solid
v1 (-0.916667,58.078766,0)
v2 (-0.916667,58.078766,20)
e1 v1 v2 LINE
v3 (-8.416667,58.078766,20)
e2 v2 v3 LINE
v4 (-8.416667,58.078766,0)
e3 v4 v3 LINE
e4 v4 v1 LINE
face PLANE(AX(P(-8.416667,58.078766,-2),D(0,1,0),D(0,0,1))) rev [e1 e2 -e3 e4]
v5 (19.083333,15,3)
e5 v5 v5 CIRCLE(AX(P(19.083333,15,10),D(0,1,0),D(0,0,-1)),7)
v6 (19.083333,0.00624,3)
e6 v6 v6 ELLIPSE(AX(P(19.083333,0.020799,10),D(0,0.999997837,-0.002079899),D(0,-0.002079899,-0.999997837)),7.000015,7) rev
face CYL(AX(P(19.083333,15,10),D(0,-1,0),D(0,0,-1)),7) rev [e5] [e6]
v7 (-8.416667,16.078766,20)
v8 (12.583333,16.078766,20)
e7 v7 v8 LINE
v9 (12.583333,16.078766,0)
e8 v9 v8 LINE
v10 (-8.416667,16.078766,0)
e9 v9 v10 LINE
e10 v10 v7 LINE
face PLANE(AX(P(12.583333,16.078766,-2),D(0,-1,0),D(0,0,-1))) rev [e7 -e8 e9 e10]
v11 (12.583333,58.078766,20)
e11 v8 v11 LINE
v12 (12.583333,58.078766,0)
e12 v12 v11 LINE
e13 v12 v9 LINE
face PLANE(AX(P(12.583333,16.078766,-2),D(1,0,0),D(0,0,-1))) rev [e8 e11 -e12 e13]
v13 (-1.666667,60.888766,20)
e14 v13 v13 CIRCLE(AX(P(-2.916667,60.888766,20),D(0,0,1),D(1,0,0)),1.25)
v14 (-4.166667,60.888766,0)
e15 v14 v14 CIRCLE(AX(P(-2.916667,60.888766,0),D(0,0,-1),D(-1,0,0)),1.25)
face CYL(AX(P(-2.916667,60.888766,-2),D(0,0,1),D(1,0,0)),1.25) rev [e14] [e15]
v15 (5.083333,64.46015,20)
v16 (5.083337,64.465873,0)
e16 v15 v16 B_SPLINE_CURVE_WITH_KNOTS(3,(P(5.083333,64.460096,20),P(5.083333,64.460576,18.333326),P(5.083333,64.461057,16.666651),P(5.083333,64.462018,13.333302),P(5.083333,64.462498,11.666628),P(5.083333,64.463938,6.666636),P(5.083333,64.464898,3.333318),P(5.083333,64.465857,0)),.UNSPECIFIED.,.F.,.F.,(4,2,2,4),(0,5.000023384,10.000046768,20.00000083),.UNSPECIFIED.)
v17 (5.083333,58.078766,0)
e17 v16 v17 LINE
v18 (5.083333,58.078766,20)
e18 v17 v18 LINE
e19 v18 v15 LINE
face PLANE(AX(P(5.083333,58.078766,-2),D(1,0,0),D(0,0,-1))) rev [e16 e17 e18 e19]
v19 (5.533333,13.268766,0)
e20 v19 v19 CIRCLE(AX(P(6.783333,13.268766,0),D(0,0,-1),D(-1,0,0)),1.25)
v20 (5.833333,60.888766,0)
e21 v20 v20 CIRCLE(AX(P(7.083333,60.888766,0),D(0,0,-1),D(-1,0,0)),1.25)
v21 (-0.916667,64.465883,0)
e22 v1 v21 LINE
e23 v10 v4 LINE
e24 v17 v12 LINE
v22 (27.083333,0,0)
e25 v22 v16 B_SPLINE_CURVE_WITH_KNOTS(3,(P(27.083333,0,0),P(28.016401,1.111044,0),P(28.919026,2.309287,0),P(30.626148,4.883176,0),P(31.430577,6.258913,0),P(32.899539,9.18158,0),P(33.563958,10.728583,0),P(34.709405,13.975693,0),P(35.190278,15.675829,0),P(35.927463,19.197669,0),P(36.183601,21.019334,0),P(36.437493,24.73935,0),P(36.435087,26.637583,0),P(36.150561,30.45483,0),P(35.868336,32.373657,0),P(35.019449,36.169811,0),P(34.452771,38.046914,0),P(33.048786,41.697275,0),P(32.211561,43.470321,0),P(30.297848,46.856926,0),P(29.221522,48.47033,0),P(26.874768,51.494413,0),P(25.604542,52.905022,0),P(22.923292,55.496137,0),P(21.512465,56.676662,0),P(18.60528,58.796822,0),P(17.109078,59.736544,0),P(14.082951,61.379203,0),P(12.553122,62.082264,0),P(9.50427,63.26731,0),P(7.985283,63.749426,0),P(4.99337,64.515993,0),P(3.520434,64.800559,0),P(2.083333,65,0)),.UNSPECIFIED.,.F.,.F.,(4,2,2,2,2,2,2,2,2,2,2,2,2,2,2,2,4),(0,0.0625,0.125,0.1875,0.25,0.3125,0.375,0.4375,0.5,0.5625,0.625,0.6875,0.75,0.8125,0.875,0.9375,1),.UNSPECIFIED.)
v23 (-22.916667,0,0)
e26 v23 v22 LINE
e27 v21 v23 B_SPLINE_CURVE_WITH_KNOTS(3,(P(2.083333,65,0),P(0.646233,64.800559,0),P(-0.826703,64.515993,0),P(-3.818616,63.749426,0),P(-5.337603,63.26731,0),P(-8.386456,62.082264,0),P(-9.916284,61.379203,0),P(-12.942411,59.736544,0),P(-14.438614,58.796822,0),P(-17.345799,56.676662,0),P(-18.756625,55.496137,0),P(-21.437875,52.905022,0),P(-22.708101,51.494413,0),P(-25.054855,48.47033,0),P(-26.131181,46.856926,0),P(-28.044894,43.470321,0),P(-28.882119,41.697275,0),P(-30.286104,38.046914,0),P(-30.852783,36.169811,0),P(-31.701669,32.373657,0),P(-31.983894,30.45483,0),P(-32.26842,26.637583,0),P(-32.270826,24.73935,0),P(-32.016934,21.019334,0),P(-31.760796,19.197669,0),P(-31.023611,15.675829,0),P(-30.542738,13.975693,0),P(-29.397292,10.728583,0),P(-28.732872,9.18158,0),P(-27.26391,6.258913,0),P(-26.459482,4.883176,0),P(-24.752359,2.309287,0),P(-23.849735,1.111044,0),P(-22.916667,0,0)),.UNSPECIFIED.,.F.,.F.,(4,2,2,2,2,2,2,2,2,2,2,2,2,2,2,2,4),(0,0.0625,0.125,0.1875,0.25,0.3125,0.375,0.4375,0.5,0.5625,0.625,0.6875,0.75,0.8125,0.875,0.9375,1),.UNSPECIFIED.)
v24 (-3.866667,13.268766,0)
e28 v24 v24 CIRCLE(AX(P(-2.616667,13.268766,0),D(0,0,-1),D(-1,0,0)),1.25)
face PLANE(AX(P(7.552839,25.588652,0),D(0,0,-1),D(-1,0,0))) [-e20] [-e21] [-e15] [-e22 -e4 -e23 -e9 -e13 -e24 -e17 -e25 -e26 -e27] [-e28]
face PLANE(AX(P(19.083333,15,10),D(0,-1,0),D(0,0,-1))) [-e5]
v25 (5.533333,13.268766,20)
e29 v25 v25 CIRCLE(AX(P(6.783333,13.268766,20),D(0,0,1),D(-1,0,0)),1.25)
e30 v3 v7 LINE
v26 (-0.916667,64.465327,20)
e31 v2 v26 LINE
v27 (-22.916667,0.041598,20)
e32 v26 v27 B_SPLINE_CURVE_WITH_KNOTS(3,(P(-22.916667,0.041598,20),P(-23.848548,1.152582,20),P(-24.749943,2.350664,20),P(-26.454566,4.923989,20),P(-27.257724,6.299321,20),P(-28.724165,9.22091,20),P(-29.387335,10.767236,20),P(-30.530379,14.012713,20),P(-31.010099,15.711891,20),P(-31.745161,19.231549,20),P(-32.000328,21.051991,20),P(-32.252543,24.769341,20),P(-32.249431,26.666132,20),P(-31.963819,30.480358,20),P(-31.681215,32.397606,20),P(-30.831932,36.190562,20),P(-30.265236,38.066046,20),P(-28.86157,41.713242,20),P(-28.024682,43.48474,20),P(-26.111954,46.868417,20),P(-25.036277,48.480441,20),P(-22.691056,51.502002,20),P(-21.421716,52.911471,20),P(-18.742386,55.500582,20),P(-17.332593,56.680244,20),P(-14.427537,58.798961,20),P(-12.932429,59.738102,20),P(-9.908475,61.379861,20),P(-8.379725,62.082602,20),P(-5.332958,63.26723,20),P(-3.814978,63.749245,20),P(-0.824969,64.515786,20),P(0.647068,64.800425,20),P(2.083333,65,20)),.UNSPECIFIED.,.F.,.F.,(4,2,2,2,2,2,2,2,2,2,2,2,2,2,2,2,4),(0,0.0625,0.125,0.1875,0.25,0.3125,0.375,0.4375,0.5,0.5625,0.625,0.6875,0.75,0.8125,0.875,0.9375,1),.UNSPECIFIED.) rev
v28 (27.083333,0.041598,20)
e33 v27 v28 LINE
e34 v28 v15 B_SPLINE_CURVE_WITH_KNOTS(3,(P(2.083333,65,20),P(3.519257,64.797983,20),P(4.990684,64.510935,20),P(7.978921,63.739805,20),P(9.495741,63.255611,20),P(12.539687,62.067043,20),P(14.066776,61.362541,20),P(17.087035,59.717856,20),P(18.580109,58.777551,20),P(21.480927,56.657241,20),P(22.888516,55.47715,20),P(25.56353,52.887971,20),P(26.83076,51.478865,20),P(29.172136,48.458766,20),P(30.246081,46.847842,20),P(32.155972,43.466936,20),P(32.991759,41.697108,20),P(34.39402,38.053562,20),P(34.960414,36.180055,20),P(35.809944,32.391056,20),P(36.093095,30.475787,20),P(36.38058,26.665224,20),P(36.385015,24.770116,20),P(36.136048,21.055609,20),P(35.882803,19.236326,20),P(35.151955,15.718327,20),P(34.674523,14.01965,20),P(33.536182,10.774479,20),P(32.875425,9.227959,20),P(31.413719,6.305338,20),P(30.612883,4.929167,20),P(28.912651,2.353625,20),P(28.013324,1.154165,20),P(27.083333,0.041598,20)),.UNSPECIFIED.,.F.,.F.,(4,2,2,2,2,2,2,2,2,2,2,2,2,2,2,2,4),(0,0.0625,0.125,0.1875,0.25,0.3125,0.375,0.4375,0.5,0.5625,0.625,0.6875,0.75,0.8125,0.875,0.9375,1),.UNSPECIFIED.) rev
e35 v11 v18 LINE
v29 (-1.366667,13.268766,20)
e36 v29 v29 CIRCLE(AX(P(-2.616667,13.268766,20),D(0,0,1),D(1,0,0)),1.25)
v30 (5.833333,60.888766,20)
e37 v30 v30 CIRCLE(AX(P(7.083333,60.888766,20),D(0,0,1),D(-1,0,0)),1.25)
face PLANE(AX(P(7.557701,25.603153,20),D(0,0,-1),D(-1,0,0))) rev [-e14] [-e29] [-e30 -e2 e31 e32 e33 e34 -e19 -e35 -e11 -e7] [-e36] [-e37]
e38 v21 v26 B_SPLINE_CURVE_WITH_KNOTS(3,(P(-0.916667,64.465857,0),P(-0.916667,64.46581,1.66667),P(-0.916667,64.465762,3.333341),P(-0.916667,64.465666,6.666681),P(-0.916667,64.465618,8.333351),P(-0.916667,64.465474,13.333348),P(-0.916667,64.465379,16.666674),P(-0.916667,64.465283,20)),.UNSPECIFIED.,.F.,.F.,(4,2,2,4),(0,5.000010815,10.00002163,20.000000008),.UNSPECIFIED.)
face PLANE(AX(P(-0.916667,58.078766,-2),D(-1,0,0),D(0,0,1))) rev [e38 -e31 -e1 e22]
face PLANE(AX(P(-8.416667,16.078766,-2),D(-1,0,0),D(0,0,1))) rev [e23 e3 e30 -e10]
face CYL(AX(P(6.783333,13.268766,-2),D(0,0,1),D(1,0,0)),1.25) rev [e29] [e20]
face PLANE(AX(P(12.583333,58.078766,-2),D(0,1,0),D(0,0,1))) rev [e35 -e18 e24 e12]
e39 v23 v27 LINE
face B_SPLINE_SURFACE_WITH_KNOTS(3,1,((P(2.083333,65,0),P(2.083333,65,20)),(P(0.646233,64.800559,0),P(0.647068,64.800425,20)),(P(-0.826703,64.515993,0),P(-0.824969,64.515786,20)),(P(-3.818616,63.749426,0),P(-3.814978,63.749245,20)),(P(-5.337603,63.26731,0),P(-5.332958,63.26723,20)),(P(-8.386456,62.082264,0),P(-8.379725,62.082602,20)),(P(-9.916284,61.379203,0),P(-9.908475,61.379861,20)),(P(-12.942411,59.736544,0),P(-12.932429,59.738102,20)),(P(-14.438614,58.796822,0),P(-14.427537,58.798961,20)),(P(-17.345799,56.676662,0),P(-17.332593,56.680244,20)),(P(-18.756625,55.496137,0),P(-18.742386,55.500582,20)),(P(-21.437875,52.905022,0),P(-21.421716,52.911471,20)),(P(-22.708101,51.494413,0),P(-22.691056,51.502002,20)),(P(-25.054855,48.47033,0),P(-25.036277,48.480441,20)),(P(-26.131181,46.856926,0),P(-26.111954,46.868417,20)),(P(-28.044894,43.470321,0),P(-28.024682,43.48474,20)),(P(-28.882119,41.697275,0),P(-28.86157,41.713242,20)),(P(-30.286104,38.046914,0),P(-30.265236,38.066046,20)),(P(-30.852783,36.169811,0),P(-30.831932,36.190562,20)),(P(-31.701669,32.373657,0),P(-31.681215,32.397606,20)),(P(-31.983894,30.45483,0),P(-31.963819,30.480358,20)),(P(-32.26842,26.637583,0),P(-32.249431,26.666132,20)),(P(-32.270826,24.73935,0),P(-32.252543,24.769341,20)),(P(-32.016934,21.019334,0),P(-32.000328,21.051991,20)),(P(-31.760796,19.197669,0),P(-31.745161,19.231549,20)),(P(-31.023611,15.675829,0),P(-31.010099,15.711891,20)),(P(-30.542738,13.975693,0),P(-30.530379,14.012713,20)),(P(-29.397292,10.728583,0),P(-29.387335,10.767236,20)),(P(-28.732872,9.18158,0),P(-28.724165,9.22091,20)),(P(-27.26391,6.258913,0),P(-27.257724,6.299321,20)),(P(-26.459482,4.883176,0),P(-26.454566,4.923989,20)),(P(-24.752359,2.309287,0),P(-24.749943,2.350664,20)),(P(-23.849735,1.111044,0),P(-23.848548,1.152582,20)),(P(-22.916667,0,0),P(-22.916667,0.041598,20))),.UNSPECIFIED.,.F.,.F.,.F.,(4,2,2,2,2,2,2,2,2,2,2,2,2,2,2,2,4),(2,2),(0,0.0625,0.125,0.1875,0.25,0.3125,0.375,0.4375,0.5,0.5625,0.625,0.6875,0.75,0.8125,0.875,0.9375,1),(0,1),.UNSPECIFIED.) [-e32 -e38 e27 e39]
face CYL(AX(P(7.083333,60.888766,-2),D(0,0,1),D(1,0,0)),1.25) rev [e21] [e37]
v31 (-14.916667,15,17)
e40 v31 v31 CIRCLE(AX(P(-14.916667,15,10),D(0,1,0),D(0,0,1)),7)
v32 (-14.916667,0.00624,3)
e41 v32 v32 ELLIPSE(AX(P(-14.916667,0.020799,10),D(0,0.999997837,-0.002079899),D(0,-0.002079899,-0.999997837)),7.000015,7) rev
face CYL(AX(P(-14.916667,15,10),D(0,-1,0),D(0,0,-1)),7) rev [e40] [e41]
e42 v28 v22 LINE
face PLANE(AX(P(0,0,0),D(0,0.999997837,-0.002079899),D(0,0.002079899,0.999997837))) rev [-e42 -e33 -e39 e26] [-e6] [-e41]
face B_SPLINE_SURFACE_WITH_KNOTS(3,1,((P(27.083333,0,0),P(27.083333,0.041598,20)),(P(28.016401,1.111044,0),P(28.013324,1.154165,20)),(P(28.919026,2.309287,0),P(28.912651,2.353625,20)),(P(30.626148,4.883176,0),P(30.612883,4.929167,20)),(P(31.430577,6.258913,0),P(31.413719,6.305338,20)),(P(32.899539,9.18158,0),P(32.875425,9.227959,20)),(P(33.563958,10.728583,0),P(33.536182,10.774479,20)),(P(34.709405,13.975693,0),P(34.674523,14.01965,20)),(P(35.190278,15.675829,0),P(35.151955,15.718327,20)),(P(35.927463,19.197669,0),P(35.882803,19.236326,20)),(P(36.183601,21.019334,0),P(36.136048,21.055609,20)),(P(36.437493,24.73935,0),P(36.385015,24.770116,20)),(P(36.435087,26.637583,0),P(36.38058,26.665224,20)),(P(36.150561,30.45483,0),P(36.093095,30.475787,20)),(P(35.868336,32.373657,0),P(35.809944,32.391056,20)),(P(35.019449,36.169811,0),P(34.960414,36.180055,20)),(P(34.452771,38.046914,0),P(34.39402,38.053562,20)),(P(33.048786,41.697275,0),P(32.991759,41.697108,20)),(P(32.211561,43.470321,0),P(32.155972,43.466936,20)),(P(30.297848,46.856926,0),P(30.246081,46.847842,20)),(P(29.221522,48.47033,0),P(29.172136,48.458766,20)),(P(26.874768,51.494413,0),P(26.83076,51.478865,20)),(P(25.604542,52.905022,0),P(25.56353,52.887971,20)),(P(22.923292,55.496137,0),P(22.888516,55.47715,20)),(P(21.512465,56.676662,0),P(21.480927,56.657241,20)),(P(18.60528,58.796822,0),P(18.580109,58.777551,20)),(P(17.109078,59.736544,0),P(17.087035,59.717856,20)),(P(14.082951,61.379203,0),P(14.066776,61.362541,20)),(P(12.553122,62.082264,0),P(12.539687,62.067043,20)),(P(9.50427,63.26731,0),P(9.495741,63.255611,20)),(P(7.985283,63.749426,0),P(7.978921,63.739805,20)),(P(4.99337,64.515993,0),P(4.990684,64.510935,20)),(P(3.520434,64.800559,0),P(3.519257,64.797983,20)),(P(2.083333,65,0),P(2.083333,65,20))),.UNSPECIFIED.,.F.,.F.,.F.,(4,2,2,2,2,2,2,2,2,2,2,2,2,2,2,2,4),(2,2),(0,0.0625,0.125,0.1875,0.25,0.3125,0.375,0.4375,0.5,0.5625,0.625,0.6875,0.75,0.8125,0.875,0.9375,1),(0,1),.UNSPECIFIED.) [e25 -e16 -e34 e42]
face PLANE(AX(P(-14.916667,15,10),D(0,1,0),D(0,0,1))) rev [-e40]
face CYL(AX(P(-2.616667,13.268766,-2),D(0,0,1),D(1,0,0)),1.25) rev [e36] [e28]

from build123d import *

# Parameters (mm, degrees)
SKETCH5_R          = 1.25
CUT_EXTRUDE1_DEPTH = 22
SKETCH6_R          = 7
CUT_EXTRUDE2_DEPTH = 15


with BuildPart() as part:
    # Surface-Knit1: read off the stored shape, not the designer's step
    # Surface-Knit1: loft between two sections, ruled curve by curve
    surface_knit1_from = [
        Edge.make_bspline([(2.083333333, 65, 0), (0.646232747, 64.800559216, 0), (-0.826702854, 64.515993467, 0), (-3.818616425, 63.749425521, 0), (-5.337603105, 63.267310443, 0), (-8.386455572, 62.082263598, 0), (-9.916283922, 61.37920281, 0), (-12.942411074, 59.736543691, 0), (-14.438613707, 58.796821883, 0), (-17.345798661, 56.676662259, 0), (-18.756625413, 55.496137115, 0), (-21.437875212, 52.905022069, 0), (-22.708100878, 51.494412766, 0), (-25.054855252, 48.47033026, 0), (-26.131181002, 46.856926203, 0), (-28.044894258, 43.470320821, 0), (-28.882119317, 41.697275034, 0), (-30.286104482, 38.046913607, 0), (-30.852782543, 36.169811281, 0), (-31.701669093, 32.373657167, 0), (-31.983893935, 30.454829684, 0), (-32.268420202, 26.637582521, 0), (-32.270825943, 24.73935017, 0), (-32.016934112, 21.019334498, 0), (-31.760796053, 19.197669041, 0), (-31.023611092, 15.67582868, 0), (-30.542738185, 13.975693203, 0), (-29.397291667, 10.728582673, 0), (-28.732872183, 9.18158041, 0), (-27.26390999, 6.258912542, 0), (-26.459481527, 4.883176255, 0), (-24.752359253, 2.309286831, 0), (-23.849734618, 1.111044068, 0), (-22.916666667, 0, 0)], [0, 0, 0, 0, 0.0625, 0.0625, 0.125, 0.125, 0.1875, 0.1875, 0.25, 0.25, 0.3125, 0.3125, 0.375, 0.375, 0.4375, 0.4375, 0.5, 0.5, 0.5625, 0.5625, 0.625, 0.625, 0.6875, 0.6875, 0.75, 0.75, 0.8125, 0.8125, 0.875, 0.875, 0.9375, 0.9375, 1, 1, 1, 1], 3),
        Edge.make_bspline([(27.083333333, 0, 0), (28.016401284, 1.111044068, 0), (28.91902592, 2.309286831, 0), (30.626148194, 4.883176255, 0), (31.430576657, 6.258912542, 0), (32.89953885, 9.18158041, 0), (33.563958334, 10.728582673, 0), (34.709404851, 13.975693203, 0), (35.190277759, 15.67582868, 0), (35.92746272, 19.197669041, 0), (36.183600779, 21.019334498, 0), (36.437492609, 24.73935017, 0), (36.435086869, 26.637582521, 0), (36.150560602, 30.454829684, 0), (35.868335759, 32.373657167, 0), (35.019449209, 36.169811281, 0), (34.452771148, 38.046913607, 0), (33.048785984, 41.697275034, 0), (32.211560925, 43.470320821, 0), (30.297847668, 46.856926203, 0), (29.221521919, 48.47033026, 0), (26.874767544, 51.494412766, 0), (25.604541879, 52.905022069, 0), (22.92329208, 55.496137115, 0), (21.512465328, 56.676662259, 0), (18.605280373, 58.796821883, 0), (17.10907774, 59.736543691, 0), (14.082950589, 61.37920281, 0), (12.553122239, 62.082263598, 0), (9.504269772, 63.267310443, 0), (7.985283092, 63.749425521, 0), (4.993369521, 64.515993467, 0), (3.52043392, 64.800559216, 0), (2.083333333, 65, 0)], [0, 0, 0, 0, 0.0625, 0.0625, 0.125, 0.125, 0.1875, 0.1875, 0.25, 0.25, 0.3125, 0.3125, 0.375, 0.375, 0.4375, 0.4375, 0.5, 0.5, 0.5625, 0.5625, 0.625, 0.625, 0.6875, 0.6875, 0.75, 0.75, 0.8125, 0.8125, 0.875, 0.875, 0.9375, 0.9375, 1, 1, 1, 1], 3),
        Edge.make_line((27.083333333, 0, 0), (-22.916666667, 0, 0)),
    ]
    surface_knit1_to = [
        Edge.make_bspline([(2.083333333, 65, 20), (0.647068043, 64.800424513, 20), (-0.824969306, 64.515786234, 20), (-3.814978177, 63.749245223, 20), (-5.332958295, 63.267229827, 20), (-8.379725343, 62.08260226, 20), (-9.908474817, 61.379861368, 20), (-12.932428528, 59.73810206, 20), (-14.427536732, 58.798960501, 20), (-17.332592911, 56.680243894, 20), (-18.742385636, 55.500581799, 20), (-21.421715644, 52.911470639, 20), (-22.691056015, 51.502002286, 20), (-25.036276618, 48.480441163, 20), (-26.111954405, 46.8684174, 20), (-28.024682221, 43.48474031, 20), (-28.861570209, 41.713242126, 20), (-30.265236079, 38.066046457, 20), (-30.831932078, 36.190561729, 20), (-31.681215411, 32.397605605, 20), (-31.963818965, 30.480357956, 20), (-32.24943077, 26.666132321, 20), (-32.252542967, 24.76934126, 20), (-32.000328363, 21.051990902, 20), (-31.745160599, 19.231549308, 20), (-31.010098955, 15.711890824, 20), (-30.530378628, 14.01271343, 20), (-29.387334902, 10.767236468, 20), (-28.724165314, 9.220909913, 20), (-27.257723578, 6.29932121, 20), (-26.454565517, 4.923988664, 20), (-24.749943011, 2.350663913, 20), (-23.848547718, 1.152582349, 20), (-22.916666667, 0.041598071, 20)], [0, 0, 0, 0, 0.0625, 0.0625, 0.125, 0.125, 0.1875, 0.1875, 0.25, 0.25, 0.3125, 0.3125, 0.375, 0.375, 0.4375, 0.4375, 0.5, 0.5, 0.5625, 0.5625, 0.625, 0.625, 0.6875, 0.6875, 0.75, 0.75, 0.8125, 0.8125, 0.875, 0.875, 0.9375, 0.9375, 1, 1, 1, 1], 3),
        Edge.make_bspline([(27.083333333, 0.041598071, 20), (28.013324474, 1.15416485, 20), (28.912650953, 2.353624766, 20), (30.612882601, 4.929167074, 20), (31.413718634, 6.305337934, 20), (32.875425295, 9.227959299, 20), (33.536182318, 10.774479235, 20), (34.674523423, 14.019650076, 20), (35.151954723, 15.718327197, 20), (35.882803171, 19.236326493, 20), (36.136048243, 21.05560894, 20), (36.385015288, 24.770116129, 20), (36.380579809, 26.665223747, 20), (36.093095417, 30.475786604, 20), (35.809943747, 32.391056326, 20), (34.960413899, 36.18005484, 20), (34.394019828, 38.053561803, 20), (32.991758511, 41.697107973, 20), (32.155972434, 43.466936274, 20), (30.246080794, 46.847842163, 20), (29.172135744, 48.458765813, 20), (26.830760169, 51.478864648, 20), (25.563530264, 52.887971076, 20), (22.888516003, 55.477149894, 20), (21.480926996, 56.657240939, 20), (18.58010928, 58.777551077, 20), (17.087034883, 59.717856056, 20), (14.066775655, 61.362540967, 20), (12.539686611, 62.06704278, 20), (9.495740577, 63.255611058, 20), (7.978921334, 63.739805204, 20), (4.990683697, 64.510935324, 20), (3.51925729, 64.797983291, 20), (2.083333333, 65, 20)], [0, 0, 0, 0, 0.0625, 0.0625, 0.125, 0.125, 0.1875, 0.1875, 0.25, 0.25, 0.3125, 0.3125, 0.375, 0.375, 0.4375, 0.4375, 0.5, 0.5, 0.5625, 0.5625, 0.625, 0.625, 0.6875, 0.6875, 0.75, 0.75, 0.8125, 0.8125, 0.875, 0.875, 0.9375, 0.9375, 1, 1, 1, 1], 3),
        Edge.make_line((27.083333333, 0.041598071, 20), (-22.916666667, 0.041598071, 20)),
    ]
    surface_knit1 = Solid(Shell([*[Face.make_surface_from_curves(surface_knit1_from[k], surface_knit1_to[k]) for k in range(3)], Face(Wire(surface_knit1_from)), Face(Wire(surface_knit1_to))]))
    add(surface_knit1)

    # Sketch5 → Cut-Extrude1 (cut)
    with BuildSketch(Plane.XY.offset(20)):
        with Locations((-2.616666667, 13.268765789)):
            Circle(SKETCH5_R)
        with Locations((-2.916666667, 60.888765789)):
            Circle(SKETCH5_R)
        with Locations(Location((6.783333333, 13.268765789, 0), (0, 0, 180))):
            Circle(SKETCH5_R)
        with Locations(Location((7.083333333, 60.888765789, 0), (0, 0, 180))):
            Circle(SKETCH5_R)
        Polygon((12.583333333, 16.078765789), (-8.416666667, 16.078765789), (-8.416666667, 58.078765789), (-0.916666667, 58.078765789), (-0.916666667, 65.078765789), (5.083333333, 65.078765789), (5.083333333, 58.078765789), (12.583333333, 58.078765789), align=None)
    extrude(amount=-CUT_EXTRUDE1_DEPTH, mode=Mode.SUBTRACT)

    # Sketch6 → Cut-Extrude2 (cut)
    with BuildSketch(Plane(origin=(0, 0, 0), x_dir=(1, 0, 0), z_dir=(0, 1, 0))):
        with Locations(Location((-14.916666667, -10, 0), (0, 0, 90))):
            Circle(SKETCH6_R)
        with Locations(Location((19.083333333, -10, 0), (0, 0, 90))):
            Circle(SKETCH6_R)
    extrude(amount=CUT_EXTRUDE2_DEPTH, mode=Mode.SUBTRACT)


solid = part.part
